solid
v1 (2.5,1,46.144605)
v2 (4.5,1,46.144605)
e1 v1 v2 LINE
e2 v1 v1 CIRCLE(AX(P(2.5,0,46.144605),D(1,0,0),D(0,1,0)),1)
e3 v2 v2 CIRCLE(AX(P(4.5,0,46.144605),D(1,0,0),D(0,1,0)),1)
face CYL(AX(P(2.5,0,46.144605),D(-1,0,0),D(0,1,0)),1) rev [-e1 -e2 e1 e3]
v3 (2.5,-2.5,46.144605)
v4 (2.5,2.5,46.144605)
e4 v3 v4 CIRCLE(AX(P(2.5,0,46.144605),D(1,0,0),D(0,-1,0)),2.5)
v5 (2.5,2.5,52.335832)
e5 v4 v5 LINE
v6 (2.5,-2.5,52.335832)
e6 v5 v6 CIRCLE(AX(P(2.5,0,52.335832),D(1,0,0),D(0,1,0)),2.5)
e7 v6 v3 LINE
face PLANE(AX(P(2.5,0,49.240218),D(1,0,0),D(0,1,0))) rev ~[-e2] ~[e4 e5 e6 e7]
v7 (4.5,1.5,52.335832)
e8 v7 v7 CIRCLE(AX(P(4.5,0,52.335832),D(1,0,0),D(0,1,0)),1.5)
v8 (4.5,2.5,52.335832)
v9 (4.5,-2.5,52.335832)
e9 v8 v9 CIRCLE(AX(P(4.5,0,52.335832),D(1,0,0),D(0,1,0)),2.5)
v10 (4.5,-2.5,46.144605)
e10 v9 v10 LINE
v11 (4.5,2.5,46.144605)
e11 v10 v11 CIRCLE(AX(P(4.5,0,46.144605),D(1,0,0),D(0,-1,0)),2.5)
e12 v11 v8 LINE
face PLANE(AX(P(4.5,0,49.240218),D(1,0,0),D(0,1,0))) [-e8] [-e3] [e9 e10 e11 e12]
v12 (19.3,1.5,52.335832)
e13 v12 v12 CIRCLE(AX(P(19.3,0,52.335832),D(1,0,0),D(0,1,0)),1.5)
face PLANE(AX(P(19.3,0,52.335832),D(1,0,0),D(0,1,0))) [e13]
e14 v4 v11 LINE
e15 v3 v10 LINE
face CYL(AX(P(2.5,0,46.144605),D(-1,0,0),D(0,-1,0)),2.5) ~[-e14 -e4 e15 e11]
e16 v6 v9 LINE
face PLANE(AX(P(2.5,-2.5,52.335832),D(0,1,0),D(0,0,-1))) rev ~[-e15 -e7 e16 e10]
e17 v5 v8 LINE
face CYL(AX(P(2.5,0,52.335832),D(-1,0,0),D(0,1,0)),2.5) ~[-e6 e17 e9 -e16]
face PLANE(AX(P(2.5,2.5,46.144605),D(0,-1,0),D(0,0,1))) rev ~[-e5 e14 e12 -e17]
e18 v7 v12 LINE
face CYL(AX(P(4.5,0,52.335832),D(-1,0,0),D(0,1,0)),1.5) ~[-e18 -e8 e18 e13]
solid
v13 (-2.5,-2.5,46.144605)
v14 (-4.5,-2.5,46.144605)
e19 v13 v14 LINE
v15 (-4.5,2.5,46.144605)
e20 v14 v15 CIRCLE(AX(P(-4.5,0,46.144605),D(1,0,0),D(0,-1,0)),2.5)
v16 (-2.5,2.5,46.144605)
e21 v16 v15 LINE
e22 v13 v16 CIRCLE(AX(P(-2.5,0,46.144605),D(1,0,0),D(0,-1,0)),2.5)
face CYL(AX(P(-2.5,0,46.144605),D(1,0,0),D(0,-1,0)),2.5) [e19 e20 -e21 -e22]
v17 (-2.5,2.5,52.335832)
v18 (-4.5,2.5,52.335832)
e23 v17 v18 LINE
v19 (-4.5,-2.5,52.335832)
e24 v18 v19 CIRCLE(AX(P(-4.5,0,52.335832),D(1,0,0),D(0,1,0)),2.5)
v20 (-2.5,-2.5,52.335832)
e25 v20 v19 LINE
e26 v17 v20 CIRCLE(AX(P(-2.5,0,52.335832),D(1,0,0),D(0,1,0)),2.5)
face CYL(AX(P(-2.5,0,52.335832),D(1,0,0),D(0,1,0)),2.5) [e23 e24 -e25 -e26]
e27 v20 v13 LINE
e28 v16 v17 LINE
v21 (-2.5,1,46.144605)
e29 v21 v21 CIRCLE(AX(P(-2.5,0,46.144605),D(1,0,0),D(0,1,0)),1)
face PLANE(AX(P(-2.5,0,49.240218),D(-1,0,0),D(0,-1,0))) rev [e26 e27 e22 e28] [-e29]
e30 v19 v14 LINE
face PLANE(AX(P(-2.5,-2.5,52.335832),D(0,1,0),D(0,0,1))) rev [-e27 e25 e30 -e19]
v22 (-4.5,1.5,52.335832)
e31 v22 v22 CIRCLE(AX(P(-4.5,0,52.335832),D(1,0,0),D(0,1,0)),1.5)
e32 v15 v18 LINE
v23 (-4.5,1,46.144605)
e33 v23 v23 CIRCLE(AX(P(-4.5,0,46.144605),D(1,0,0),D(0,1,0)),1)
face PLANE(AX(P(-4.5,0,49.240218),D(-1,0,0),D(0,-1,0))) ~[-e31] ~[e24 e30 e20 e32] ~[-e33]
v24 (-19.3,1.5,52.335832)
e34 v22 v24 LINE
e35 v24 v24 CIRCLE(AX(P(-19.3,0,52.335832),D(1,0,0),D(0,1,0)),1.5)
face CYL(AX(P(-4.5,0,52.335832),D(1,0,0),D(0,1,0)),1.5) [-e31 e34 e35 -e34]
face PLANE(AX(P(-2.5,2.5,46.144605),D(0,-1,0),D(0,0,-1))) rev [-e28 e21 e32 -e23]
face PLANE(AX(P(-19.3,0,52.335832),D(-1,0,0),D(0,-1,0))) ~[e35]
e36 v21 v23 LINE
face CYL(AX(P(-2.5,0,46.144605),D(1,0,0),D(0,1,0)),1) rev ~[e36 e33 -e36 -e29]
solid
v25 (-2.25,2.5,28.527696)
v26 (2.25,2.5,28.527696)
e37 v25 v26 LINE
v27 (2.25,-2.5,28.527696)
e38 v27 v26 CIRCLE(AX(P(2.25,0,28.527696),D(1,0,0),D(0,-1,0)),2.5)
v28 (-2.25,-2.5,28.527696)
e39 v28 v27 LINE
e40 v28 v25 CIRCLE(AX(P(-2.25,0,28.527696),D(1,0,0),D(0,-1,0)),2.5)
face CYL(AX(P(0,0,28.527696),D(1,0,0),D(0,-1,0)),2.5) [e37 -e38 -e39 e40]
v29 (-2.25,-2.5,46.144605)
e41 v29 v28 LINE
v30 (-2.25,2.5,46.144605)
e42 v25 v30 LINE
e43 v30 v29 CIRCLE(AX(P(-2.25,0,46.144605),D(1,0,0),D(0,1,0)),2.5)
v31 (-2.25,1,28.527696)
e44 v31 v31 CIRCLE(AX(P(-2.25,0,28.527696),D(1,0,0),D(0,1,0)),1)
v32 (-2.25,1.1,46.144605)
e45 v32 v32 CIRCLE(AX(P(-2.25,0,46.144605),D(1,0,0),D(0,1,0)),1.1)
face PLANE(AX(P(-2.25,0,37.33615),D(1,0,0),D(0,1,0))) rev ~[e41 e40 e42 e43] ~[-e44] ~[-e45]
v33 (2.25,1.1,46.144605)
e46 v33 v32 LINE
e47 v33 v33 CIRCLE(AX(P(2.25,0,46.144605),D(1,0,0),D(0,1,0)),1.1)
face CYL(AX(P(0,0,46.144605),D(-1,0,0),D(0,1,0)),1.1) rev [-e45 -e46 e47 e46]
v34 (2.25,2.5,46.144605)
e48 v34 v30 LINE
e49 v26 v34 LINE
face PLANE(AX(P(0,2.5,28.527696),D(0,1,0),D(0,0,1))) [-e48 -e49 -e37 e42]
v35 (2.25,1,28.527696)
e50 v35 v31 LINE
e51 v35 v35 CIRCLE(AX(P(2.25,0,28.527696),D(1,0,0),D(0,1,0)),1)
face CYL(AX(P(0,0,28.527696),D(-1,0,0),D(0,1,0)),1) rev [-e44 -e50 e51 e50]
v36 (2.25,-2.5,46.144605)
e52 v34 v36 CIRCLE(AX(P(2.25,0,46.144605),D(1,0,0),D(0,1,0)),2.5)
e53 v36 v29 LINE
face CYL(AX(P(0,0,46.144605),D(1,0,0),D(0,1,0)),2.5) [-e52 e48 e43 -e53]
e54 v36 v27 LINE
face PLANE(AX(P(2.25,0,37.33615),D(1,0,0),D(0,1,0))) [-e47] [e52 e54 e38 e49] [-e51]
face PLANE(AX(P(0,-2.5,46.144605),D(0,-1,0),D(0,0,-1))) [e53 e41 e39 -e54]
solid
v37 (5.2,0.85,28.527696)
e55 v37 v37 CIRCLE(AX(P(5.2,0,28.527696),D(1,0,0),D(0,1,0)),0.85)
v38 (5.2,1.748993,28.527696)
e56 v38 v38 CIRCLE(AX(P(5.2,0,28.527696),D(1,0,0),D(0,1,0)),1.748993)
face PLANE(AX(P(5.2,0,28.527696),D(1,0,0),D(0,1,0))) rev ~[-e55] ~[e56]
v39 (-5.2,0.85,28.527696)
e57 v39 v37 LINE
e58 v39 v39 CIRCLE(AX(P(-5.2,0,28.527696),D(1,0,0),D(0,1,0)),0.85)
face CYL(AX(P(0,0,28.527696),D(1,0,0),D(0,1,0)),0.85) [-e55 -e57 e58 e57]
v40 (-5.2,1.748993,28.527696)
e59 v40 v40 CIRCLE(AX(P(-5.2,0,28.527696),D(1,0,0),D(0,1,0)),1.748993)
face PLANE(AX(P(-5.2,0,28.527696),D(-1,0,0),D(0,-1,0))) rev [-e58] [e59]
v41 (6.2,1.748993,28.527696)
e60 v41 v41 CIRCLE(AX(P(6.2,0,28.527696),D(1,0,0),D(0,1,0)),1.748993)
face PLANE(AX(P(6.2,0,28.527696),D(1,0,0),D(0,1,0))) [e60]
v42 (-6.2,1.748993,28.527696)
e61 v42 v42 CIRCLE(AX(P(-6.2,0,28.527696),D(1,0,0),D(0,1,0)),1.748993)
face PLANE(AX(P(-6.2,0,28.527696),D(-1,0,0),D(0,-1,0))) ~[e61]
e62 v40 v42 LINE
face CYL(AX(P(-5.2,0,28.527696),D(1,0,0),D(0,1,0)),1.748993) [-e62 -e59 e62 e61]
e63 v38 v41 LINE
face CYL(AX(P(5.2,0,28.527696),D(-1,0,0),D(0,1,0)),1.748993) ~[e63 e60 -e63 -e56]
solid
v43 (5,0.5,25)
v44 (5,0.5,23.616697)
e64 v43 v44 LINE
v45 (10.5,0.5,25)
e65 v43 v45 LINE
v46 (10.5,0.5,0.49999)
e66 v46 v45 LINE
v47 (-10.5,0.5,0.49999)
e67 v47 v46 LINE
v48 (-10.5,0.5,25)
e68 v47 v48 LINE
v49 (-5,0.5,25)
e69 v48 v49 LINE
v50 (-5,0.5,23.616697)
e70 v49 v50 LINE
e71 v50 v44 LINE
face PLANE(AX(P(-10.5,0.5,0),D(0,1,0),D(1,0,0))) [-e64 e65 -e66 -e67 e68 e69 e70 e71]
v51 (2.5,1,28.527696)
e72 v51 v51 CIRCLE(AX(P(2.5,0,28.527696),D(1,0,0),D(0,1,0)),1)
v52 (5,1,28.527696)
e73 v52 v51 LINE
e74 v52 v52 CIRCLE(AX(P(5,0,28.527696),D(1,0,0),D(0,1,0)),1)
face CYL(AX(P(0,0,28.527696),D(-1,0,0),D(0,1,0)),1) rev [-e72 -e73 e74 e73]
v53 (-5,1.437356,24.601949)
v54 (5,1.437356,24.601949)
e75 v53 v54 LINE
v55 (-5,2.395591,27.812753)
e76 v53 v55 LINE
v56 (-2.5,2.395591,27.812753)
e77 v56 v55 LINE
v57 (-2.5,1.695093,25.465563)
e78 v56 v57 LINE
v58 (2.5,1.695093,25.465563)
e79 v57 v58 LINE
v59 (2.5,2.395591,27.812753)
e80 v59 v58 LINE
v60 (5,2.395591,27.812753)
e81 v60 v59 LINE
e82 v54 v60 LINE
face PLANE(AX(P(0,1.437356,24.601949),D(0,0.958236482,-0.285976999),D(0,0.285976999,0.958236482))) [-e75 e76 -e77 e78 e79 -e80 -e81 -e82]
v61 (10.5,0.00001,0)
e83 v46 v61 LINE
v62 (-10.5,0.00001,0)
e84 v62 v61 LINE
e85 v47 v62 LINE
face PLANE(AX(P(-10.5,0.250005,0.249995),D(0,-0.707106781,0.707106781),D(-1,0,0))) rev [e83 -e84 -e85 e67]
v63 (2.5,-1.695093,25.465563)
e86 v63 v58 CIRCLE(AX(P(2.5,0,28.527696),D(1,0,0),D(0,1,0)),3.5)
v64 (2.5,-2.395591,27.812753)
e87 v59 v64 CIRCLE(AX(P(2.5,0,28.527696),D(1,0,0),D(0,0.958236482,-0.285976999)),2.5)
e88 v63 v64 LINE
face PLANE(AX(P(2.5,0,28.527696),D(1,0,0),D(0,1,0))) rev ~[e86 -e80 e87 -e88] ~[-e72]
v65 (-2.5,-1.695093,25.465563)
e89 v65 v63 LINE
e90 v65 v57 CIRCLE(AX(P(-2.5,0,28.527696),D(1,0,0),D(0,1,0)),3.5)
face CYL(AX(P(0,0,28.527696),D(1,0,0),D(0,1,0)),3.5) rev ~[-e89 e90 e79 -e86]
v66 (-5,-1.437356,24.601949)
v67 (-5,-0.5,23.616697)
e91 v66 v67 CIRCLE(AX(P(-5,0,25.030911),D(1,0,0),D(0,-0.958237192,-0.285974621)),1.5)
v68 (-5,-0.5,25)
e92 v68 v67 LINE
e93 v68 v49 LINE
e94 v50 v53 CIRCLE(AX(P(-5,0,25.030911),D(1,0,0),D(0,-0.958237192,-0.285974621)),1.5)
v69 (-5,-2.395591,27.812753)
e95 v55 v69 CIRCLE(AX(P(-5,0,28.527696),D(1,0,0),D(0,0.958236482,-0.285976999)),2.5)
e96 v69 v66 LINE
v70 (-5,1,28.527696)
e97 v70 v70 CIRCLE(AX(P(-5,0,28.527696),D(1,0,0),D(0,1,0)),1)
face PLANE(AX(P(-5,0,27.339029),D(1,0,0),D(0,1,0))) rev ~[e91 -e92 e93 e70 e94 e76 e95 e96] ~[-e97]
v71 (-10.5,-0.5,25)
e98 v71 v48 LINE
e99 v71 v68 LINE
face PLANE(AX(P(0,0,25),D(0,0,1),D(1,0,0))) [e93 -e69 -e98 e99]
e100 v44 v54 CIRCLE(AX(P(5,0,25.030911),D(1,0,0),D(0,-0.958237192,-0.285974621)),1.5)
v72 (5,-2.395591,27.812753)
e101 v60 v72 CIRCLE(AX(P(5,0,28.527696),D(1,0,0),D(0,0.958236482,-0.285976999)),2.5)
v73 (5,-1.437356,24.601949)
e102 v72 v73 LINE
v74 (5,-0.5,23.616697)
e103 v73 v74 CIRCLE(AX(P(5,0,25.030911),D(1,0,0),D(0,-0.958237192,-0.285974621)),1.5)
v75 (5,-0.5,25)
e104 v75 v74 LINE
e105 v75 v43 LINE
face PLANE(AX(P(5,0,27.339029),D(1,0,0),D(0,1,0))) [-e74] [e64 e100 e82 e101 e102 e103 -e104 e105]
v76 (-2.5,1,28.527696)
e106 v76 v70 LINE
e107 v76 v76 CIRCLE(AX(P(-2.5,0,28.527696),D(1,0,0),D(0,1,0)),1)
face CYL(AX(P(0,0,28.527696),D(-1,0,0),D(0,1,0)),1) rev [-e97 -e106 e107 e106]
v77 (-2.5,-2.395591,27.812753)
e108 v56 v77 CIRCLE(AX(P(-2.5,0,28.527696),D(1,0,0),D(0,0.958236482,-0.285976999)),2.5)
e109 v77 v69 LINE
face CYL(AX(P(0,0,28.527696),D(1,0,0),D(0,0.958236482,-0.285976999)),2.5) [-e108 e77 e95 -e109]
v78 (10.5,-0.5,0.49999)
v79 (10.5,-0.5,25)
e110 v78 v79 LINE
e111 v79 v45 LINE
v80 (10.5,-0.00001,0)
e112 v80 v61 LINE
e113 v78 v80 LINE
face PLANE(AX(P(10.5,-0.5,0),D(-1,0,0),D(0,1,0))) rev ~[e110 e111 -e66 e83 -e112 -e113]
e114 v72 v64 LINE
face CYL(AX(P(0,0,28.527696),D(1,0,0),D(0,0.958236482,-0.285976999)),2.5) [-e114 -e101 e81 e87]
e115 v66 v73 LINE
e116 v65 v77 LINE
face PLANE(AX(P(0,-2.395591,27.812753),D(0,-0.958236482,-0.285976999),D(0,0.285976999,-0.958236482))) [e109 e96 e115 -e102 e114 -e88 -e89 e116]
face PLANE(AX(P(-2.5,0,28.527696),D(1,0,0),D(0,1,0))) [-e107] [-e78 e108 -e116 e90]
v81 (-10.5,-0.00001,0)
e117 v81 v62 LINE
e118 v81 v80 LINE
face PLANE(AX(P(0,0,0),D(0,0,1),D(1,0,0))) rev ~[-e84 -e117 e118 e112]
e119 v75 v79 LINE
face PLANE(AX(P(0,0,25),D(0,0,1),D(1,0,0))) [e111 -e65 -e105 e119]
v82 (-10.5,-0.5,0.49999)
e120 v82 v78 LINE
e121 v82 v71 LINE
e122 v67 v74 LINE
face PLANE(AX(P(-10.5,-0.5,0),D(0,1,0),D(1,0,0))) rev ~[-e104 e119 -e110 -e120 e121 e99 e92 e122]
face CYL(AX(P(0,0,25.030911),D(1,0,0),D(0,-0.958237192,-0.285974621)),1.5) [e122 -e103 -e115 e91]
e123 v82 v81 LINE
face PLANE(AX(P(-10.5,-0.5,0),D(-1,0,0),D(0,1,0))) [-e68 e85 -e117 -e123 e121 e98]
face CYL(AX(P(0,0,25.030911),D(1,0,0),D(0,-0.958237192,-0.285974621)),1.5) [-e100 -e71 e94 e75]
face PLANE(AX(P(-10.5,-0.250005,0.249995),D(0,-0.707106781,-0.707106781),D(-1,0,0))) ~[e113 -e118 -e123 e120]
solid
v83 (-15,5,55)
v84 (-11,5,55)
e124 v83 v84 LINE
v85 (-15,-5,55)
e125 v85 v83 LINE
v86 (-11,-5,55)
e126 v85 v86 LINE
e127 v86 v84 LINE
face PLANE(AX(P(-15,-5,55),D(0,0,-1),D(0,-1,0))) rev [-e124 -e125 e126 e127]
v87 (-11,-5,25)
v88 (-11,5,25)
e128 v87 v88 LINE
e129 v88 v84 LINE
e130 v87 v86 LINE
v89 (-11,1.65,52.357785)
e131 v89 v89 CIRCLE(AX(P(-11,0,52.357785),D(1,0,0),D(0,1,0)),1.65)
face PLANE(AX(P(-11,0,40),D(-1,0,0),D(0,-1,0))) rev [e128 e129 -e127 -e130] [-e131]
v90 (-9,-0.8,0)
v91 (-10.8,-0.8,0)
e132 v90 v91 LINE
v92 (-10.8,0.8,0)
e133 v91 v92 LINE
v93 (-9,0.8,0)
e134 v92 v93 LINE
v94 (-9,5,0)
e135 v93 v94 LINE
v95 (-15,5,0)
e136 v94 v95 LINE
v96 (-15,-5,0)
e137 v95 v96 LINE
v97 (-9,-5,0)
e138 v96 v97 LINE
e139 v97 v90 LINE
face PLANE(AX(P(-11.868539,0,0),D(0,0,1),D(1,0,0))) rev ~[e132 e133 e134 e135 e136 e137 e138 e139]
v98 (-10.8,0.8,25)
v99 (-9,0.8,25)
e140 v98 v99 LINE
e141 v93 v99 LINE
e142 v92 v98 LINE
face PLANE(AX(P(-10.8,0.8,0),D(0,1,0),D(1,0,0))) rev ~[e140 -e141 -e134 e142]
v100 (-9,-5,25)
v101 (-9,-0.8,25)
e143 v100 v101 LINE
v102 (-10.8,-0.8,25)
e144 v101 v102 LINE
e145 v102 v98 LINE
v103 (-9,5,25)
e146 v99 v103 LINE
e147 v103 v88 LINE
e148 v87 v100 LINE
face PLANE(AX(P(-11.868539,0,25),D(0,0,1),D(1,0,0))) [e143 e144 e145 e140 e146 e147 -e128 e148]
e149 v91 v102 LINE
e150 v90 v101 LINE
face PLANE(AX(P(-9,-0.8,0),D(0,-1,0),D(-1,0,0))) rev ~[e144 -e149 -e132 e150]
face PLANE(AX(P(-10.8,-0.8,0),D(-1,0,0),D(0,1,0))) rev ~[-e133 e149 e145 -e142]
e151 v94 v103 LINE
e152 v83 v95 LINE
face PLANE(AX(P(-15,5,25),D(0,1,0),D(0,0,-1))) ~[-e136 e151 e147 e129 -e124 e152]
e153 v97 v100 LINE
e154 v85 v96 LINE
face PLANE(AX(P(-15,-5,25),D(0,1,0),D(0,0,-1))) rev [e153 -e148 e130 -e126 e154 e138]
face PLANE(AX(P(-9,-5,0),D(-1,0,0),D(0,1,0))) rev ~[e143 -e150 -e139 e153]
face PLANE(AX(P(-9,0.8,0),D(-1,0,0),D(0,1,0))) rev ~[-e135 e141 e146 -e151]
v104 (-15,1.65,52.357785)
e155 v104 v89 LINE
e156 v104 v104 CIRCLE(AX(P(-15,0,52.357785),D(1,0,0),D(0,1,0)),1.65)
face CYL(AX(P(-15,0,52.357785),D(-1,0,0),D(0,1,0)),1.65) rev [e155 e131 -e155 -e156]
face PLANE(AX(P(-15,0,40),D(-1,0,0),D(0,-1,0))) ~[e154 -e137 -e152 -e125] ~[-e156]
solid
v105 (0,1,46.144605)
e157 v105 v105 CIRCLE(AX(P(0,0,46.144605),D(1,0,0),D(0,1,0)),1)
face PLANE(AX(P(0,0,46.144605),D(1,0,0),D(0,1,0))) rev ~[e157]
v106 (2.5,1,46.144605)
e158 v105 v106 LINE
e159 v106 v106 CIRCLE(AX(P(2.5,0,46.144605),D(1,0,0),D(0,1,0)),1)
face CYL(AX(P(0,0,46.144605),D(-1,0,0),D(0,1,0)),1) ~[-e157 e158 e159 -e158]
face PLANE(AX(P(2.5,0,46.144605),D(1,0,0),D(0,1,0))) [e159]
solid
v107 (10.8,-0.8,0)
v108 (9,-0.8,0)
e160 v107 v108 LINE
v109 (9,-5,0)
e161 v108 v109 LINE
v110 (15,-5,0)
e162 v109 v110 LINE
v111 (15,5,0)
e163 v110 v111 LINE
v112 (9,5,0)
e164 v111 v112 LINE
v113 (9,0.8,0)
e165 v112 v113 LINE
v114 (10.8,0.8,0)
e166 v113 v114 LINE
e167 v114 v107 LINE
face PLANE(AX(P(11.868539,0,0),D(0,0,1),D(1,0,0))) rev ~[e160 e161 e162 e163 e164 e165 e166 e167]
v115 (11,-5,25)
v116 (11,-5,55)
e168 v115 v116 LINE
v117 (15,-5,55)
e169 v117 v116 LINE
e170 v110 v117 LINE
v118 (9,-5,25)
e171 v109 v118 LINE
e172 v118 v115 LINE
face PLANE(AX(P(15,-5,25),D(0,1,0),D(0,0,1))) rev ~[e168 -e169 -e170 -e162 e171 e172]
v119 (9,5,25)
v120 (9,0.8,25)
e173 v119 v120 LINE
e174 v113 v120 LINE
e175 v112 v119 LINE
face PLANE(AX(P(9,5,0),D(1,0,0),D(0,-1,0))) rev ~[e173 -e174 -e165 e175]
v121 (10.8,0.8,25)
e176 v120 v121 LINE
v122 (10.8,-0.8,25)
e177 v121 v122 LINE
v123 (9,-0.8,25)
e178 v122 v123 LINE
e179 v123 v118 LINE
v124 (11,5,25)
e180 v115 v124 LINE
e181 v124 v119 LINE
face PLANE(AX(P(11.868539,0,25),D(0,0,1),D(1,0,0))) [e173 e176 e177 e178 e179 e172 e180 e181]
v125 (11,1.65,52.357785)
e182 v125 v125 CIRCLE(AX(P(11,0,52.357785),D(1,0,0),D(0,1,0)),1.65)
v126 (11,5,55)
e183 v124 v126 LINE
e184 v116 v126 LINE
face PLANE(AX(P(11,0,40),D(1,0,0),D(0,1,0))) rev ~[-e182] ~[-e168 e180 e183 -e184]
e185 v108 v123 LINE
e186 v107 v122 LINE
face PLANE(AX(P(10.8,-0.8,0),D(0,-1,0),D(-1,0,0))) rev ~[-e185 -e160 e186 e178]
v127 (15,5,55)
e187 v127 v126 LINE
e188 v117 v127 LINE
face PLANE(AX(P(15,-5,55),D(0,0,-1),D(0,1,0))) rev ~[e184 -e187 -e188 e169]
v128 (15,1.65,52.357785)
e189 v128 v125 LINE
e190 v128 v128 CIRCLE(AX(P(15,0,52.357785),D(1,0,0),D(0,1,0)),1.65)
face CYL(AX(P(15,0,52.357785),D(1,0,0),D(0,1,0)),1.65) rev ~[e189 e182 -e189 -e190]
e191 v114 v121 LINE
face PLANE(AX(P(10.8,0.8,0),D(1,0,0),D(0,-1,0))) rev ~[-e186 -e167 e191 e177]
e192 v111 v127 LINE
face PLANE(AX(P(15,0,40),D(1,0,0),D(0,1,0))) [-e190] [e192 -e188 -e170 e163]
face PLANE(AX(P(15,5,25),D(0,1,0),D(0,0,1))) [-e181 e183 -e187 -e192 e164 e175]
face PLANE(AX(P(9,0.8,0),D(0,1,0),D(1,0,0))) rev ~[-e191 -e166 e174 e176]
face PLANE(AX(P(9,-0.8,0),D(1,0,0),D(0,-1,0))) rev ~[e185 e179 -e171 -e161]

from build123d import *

# Parameters (mm, degrees)
F1_DEPTH  = 25
F0_W      = 21
F0_H      = 1
F2_SIZE   = 0.49999
F3_R      = 1
F4_DEPTH  = 5
F5_R      = 3.5
F5_R_2    = 1
F6_DEPTH  = 2.5
F7_R      = 0.8500000113
F8_DEPTH  = 5.2
F9_R      = 1.7489925994
F10_DEPTH = 1
F12_R     = 1
F12_R_2   = 1.1
F13_DEPTH = 2.25
F14_R     = 1
F15_DEPTH = 2.5
F16_R     = 1
F17_DEPTH = 2
F18_R     = 1.5
F19_DEPTH = 14.8
F21_W     = 10
F21_H     = 30
F21_R     = 1.65
F22_DEPTH = 4


# Not quite as in the source:
# - a fillet or chamfer is up to 0.001 mm smaller than in the source, because OpenCascade refuses the exact size


with BuildPart() as f1:
    # F0 (on Top) → F1 (new body)
    with BuildSketch(Plane.XY):
        Polygon((-9, 5), (-15, 5), (-15, -5), (-9, -5), (-9, -0.8), (-10.8, -0.8), (-10.8, 0.8), (-9, 0.8), align=None)
    extrude(amount=F1_DEPTH)

    # F23: F1b across plane


with BuildPart() as f1b:
    # F0 (on Top) → F1, piece 2 (new body)
    with BuildSketch(Plane.XY):
        Polygon((15, -5), (15, 5), (9, 5), (9, 0.8), (10.8, 0.8), (10.8, -0.8), (9, -0.8), (9, -5), align=None)
    extrude(amount=F1_DEPTH)

    # F21 (on face) → F22 (join)
    with BuildSketch(Plane.YZ.offset(15)):
        with Locations((0, 40)):
            Rectangle(F21_W, F21_H)
        with Locations((0, 52.3577854037)):
            Circle(F21_R, mode=Mode.SUBTRACT)
    extrude(amount=-F22_DEPTH)


with BuildPart() as f1c:
    # F0 (on Top) → F1, piece 3 (new body)
    with BuildSketch(Plane.XY):
        Rectangle(F0_W, F0_H)
    extrude(amount=F1_DEPTH)

    # F2 (size 0.5 in the source; OpenCascade refuses exactly that, so slightly less here)
    f2_edges = [f1c.edges().sort_by_distance(p)[0] for p in [
        (0, -0.5, 0),
        (0, 0.5, 0),
    ]]
    chamfer(f2_edges, length=F2_SIZE)

    # F3 (on Right) → F4 (join, symmetric)
    with BuildSketch(Plane.YZ):
        with BuildLine():
            Line((-2.3955912057, 27.8127531877), (-1.4373557878, 24.6019490366))
            ThreePointArc((-1.4373557878, 24.6019490366), (0, 23.5309109688), (1.4373557878, 24.6019490366))
            Line((1.4373557878, 24.6019490366), (2.3955912057, 27.8127531877))
            ThreePointArc((2.3955912057, 27.8127531877), (0, 31.0276956856), (-2.3955912057, 27.8127531877))
        make_face()
        with Locations((0, 28.5276956856)):
            Circle(F3_R, mode=Mode.SUBTRACT)
    extrude(amount=F4_DEPTH, both=True)

    # F5 (on Right) → F6 (cut, symmetric)
    with BuildSketch(Plane.YZ):
        with Locations((0, 28.5276956856)):
            Circle(F5_R)
        with Locations((0, 28.5276956856)):
            Circle(F5_R_2, mode=Mode.SUBTRACT)
    extrude(amount=F6_DEPTH, both=True, mode=Mode.SUBTRACT)


with BuildPart() as f8:
    # F7 (on Right) → F8 (new body)
    with BuildSketch(Plane.YZ):
        with Locations((0, 28.5276956856)):
            Circle(F7_R)
    extrude(amount=F8_DEPTH)

    # F9 (on face) → F10 (join)
    with BuildSketch(Plane.YZ.offset(5.2)):
        with Locations((0, 28.5276956856)):
            Circle(F9_R)
    extrude(amount=F10_DEPTH)

    # F11: F8 across plane


with BuildPart() as f8_1:
    add(f8.part)
    add(f8.part.mirror(Plane.YZ))


with BuildPart() as f13:
    # F12 (on Right) → F13 (new body, symmetric)
    with BuildSketch(Plane.YZ):
        with BuildLine():
            Line((-2.5, 46.1446046829), (-2.5, 28.5276956856))
            ThreePointArc((-2.5, 28.5276956856), (0, 26.0276956856), (2.5, 28.5276956856))
            Line((2.5, 28.5276956856), (2.5, 46.1446046829))
            ThreePointArc((2.5, 46.1446046829), (0, 48.6446046829), (-2.5, 46.1446046829))
        make_face()
        with Locations((0, 28.5276956856)):
            Circle(F12_R, mode=Mode.SUBTRACT)
        with Locations((0, 46.1446046829)):
            Circle(F12_R_2, mode=Mode.SUBTRACT)
    extrude(amount=F13_DEPTH, both=True)


with BuildPart() as f15:
    # F14 (on Right) → F15 (new body)
    with BuildSketch(Plane.YZ):
        with Locations((0, 46.1446046829)):
            Circle(F14_R)
    extrude(amount=F15_DEPTH)


with BuildPart() as f17:
    # F16 (on face) → F17 (new body)
    with BuildSketch(Plane.YZ.offset(2.5)):
        with BuildLine():
            Line((-2.5, 52.335832268), (-2.5, 46.1446046829))
            ThreePointArc((-2.5, 46.1446046829), (0, 43.6446046829), (2.5, 46.1446046829))
            Line((2.5, 46.1446046829), (2.5, 52.335832268))
            ThreePointArc((2.5, 52.335832268), (0, 54.835832268), (-2.5, 52.335832268))
        make_face()
        with Locations((0, 46.1446046829)):
            Circle(F16_R, mode=Mode.SUBTRACT)
    extrude(amount=F17_DEPTH)

    # F18 (on face) → F19 (join)
    with BuildSketch(Plane.YZ.offset(4.5)):
        with Locations((0, 52.335832268)):
            Circle(F18_R)
    extrude(amount=F19_DEPTH)


with BuildPart() as f20_1:
    # F20: instance of F17
    add(f17.part.mirror(Plane.YZ))


with BuildPart() as f1_1:
    add(f1.part)
    add(f1b.part.mirror(Plane.YZ))


solid = Compound([f1b.part, f1c.part, f8_1.part, f13.part, f15.part, f17.part, f20_1.part, f1_1.part])
